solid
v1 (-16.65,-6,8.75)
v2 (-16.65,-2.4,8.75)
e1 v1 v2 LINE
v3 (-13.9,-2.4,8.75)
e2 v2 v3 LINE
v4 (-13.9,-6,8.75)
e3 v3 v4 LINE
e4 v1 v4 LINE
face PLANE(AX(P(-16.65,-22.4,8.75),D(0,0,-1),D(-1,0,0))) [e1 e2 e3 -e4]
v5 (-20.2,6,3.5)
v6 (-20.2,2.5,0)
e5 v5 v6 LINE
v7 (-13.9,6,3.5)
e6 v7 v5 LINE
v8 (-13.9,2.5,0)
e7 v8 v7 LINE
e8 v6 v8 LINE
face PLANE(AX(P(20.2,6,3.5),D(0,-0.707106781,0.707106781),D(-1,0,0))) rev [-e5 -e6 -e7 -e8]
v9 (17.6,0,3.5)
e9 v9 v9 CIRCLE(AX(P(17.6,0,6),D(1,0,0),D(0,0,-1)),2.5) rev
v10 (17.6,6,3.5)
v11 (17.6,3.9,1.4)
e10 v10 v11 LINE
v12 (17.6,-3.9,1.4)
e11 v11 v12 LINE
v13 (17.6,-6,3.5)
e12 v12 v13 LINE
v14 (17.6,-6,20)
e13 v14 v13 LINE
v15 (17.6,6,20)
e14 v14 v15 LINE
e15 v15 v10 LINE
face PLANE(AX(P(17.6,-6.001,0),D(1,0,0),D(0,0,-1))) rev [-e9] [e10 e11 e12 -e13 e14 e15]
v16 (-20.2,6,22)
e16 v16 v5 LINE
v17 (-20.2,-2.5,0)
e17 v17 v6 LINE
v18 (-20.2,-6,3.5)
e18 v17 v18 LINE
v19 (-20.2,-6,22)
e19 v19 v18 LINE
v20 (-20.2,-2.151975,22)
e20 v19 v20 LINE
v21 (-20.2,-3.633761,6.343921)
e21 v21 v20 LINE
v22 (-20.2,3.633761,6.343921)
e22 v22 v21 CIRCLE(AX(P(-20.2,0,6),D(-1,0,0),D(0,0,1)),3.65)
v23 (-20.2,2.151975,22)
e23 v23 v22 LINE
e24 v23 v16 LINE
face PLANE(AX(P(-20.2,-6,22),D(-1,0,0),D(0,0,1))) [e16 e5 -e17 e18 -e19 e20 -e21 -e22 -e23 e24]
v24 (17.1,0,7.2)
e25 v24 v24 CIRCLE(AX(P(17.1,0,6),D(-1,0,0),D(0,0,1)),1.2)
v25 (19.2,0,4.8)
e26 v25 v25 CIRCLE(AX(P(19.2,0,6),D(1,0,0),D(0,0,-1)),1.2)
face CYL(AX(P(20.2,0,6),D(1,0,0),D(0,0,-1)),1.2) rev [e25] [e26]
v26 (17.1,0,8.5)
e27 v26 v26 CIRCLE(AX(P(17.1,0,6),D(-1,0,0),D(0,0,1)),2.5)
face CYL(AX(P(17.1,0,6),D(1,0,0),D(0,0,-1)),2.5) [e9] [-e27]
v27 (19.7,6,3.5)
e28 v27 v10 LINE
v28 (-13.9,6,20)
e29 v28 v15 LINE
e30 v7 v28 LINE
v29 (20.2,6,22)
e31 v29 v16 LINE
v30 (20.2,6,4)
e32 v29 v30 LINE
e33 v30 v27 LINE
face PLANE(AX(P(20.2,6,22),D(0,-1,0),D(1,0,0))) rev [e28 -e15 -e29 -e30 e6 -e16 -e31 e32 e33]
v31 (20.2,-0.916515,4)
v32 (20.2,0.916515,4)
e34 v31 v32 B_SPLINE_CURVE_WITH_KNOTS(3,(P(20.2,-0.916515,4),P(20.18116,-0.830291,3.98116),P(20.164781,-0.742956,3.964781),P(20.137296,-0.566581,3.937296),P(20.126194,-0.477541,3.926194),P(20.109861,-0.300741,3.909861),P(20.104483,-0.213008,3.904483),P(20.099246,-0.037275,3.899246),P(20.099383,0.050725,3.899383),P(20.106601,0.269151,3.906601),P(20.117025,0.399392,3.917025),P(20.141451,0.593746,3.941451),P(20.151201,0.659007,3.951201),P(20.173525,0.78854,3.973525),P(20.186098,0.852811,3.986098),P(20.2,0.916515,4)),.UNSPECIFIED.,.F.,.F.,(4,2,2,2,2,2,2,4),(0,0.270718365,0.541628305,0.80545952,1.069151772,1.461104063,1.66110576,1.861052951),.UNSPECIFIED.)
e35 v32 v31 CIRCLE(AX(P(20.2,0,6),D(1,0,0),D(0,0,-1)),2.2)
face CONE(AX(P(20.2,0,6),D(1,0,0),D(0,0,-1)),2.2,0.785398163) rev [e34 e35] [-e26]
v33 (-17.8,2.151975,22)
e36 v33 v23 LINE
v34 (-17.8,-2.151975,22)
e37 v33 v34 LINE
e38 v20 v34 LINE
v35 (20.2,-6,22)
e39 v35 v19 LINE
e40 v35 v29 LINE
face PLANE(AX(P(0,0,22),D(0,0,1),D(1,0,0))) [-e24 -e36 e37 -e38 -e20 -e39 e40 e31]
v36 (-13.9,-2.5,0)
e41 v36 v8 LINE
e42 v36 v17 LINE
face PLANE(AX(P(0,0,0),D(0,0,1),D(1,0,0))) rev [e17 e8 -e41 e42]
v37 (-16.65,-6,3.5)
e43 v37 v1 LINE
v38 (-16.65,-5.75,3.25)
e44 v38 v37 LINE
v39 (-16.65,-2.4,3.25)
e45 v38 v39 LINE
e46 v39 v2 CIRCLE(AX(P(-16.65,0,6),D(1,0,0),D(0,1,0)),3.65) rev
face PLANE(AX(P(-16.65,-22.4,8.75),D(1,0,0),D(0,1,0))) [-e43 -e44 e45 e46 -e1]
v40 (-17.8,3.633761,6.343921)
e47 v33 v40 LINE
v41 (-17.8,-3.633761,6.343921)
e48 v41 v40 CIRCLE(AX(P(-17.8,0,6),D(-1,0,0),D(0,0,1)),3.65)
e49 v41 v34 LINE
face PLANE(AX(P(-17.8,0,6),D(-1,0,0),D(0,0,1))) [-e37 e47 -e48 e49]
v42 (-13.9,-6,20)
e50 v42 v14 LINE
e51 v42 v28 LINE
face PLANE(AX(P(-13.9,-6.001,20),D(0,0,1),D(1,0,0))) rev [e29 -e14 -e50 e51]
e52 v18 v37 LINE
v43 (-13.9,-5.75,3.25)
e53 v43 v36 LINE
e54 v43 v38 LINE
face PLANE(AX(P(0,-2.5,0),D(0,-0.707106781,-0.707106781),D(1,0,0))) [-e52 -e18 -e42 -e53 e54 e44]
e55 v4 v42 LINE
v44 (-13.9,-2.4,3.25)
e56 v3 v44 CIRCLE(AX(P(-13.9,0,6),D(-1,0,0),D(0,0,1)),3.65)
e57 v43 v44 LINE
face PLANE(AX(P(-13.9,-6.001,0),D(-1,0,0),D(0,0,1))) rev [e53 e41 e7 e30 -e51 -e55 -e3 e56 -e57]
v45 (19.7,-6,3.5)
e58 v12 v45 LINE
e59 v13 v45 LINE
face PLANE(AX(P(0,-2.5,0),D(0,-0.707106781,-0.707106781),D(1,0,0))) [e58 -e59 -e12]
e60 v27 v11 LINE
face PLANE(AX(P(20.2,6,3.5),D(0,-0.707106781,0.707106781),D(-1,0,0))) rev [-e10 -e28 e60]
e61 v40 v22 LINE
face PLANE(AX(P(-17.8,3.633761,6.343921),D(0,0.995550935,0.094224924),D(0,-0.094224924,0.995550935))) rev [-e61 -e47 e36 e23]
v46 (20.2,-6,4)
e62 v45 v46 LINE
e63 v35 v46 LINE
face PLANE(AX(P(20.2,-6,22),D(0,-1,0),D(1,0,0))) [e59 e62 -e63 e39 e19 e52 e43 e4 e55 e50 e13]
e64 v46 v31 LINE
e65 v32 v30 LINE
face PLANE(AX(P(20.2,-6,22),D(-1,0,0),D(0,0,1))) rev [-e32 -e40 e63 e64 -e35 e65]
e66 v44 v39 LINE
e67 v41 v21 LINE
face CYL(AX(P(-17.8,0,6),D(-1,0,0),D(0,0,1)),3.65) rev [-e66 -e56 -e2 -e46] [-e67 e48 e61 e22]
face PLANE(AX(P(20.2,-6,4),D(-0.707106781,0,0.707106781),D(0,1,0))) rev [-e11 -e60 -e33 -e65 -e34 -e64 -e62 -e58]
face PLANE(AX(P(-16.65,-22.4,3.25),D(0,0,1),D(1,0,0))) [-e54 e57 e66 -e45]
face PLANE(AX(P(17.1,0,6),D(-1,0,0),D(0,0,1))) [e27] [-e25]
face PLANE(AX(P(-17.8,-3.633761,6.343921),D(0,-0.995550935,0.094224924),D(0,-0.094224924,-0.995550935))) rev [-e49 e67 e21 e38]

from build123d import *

# Parameters (mm, degrees)
SKETCH1_W                                       = 40.4
SKETCH1_H                                       = 12
BOSS_EXTRUDE1_DEPTH                             = 22
CUT_EXTRUDE1_REACH                              = 34.188
SKETCH2_W                                       = 31.5
SKETCH2_H                                       = 20
CUT_EXTRUDE2_REACH                              = 48.391
SKETCH4_R                                       = 0.9
CHAMFER1_SIZE                                   = 3.5
CSK_FOR_M2_FLAT_HEAD_MACHINE_SCREW1_D           = 2.4
CSK_FOR_M2_FLAT_HEAD_MACHINE_SCREW1_DEPTH       = 12.7
CSK_FOR_M2_FLAT_HEAD_MACHINE_SCREW1_CSINK_D     = 4.4
CSK_FOR_M2_FLAT_HEAD_MACHINE_SCREW1_CSINK_ANGLE = 90
CSK_FOR_M2_FLAT_HEAD_MACHINE_SCREW1_TIP         = 0.721032743
CHAMFER2_SIZE                                   = 4
BOSS_EXTRUDE2_START                             = 0.5
SKETCH20_R                                      = 2.5
SKETCH20_R_2                                    = 1.2
BOSS_EXTRUDE2_DEPTH                             = 0.5
CUT_EXTRUDE3_DEPTH                              = 2.4
SKETCH23_R                                      = 3.65
CUT_EXTRUDE4_DEPTH                              = 22.4
SKETCH24_W                                      = 5.5
SKETCH24_H                                      = 5.5
CUT_EXTRUDE5_DEPTH                              = 22.4


with BuildPart() as part:
    # Sketch1 → Boss-Extrude1 (new body)
    with BuildSketch(Plane.XY):
        Rectangle(SKETCH1_W, SKETCH1_H)
    extrude(amount=BOSS_EXTRUDE1_DEPTH)

    # Sketch2 → Cut-Extrude1 (cut, up to next)
    with BuildSketch(Plane(origin=(0, 6, 0), x_dir=(1, 0, 0), z_dir=(0, 1, 0)), mode=Mode.PRIVATE) as cut_extrude1_sk1:
        with Locations((1.85, -10)):
            Rectangle(SKETCH2_W, SKETCH2_H)
    cut_extrude1_tool1 = extrude(cut_extrude1_sk1.sketch, amount=-CUT_EXTRUDE1_REACH, mode=Mode.PRIVATE) & part.part
    add(cut_extrude1_tool1.solids().sort_by_distance((1.85, 6, 10))[0], mode=Mode.SUBTRACT)

    # Sketch4 → Cut-Extrude2 (cut, up to next)
    with BuildSketch(Plane(origin=(20.2, 0, 0), x_dir=(0, 0, -1), z_dir=(1, 0, 0)), mode=Mode.PRIVATE) as cut_extrude2_sk1:
        with Locations((-6, 0)):
            Circle(SKETCH4_R)
    cut_extrude2_tool1 = extrude(cut_extrude2_sk1.sketch, amount=-CUT_EXTRUDE2_REACH, mode=Mode.PRIVATE) & part.part
    add(cut_extrude2_tool1.solids().sort_by_distance((20.2, 0, 6))[0], mode=Mode.SUBTRACT)

    # Chamfer1
    chamfer1_edges = [part.edges().sort_by_distance(p)[0] for p in [
        (-17.05, -6, 0),
        (-17.05, 6, 0),
        (18.9, -6, 0),
        (18.9, 6, 0),
    ]]
    chamfer(chamfer1_edges, length=CHAMFER1_SIZE)

    # CSK for M2 Flat Head Machine Screw1
    with Locations(Plane(origin=(20.2, 0, 0), x_dir=(0, 0, -1), z_dir=(1, 0, 0))):
        with Locations((-6, 0)):
            CounterSinkHole(CSK_FOR_M2_FLAT_HEAD_MACHINE_SCREW1_D / 2, CSK_FOR_M2_FLAT_HEAD_MACHINE_SCREW1_CSINK_D / 2, depth=CSK_FOR_M2_FLAT_HEAD_MACHINE_SCREW1_DEPTH, counter_sink_angle=CSK_FOR_M2_FLAT_HEAD_MACHINE_SCREW1_CSINK_ANGLE)
            with Locations((0, 0, -(CSK_FOR_M2_FLAT_HEAD_MACHINE_SCREW1_DEPTH + CSK_FOR_M2_FLAT_HEAD_MACHINE_SCREW1_TIP / 2))):  # 118° drill point
                Cone(0, CSK_FOR_M2_FLAT_HEAD_MACHINE_SCREW1_D / 2, CSK_FOR_M2_FLAT_HEAD_MACHINE_SCREW1_TIP, mode=Mode.SUBTRACT)

    # Chamfer2
    # the kernel refuses this chamfer: 4 mm, written as the material it takes off along each edge
    with BuildSketch(Plane(origin=(20.2, 12.786731952, 0), x_dir=(-0.9996219169112968, 0, -0.027495876610586365), z_dir=(0, -1, 0))) as chamfer2_piece_1:
        Polygon((CHAMFER2_SIZE * 0.999621916911, -CHAMFER2_SIZE * 0.0274958766106), (-CHAMFER2_SIZE * 0.0274958766106, -CHAMFER2_SIZE * 0.999621916911), (0, 0), align=None)
    extrude(amount=25.573463904, mode=Mode.SUBTRACT)

    # Sketch20 → Boss-Extrude2 (add)
    with BuildSketch(Plane.ZY.offset(-17.6).offset(BOSS_EXTRUDE2_START)):
        with Locations(Location((6, 0, 0), (0, 0, 180))):
            Circle(SKETCH20_R)
        with Locations(Location((6, 0, 0), (0, 0, 180))):
            Circle(SKETCH20_R_2, mode=Mode.SUBTRACT)
    extrude(amount=-BOSS_EXTRUDE2_DEPTH)

    # Sketch5 → Cut-Extrude3 (cut)
    with BuildSketch(Plane.ZY.offset(20.2)):
        with BuildLine():
            Line((6.343920973, 3.633760912), (22.64787234, 2.090656963))
            ThreePointArc((22.64787234, 2.090656963), (24.55, 0), (22.64787234, -2.090656963))
            Line((22.64787234, -2.090656963), (6.343920973, -3.633760912))
            ThreePointArc((6.343920973, -3.633760912), (2.35, 0), (6.343920973, 3.633760912))
        make_face()
    extrude(amount=-CUT_EXTRUDE3_DEPTH, mode=Mode.SUBTRACT)

    # Sketch23 → Cut-Extrude4 (cut)
    with BuildSketch(Plane.ZY.offset(17.8)):
        with Locations((6, 0)):
            Circle(SKETCH23_R)
    extrude(amount=-CUT_EXTRUDE4_DEPTH, mode=Mode.SUBTRACT)

    # Sketch24 → Cut-Extrude5 (cut)
    with BuildSketch(Plane(origin=(0, 0, 0), x_dir=(-1, 0, 0), z_dir=(0, -1, 0))):
        with Locations((13.9, -6)):
            Rectangle(SKETCH24_W, SKETCH24_H)
    extrude(amount=CUT_EXTRUDE5_DEPTH, mode=Mode.SUBTRACT)


solid = part.part
